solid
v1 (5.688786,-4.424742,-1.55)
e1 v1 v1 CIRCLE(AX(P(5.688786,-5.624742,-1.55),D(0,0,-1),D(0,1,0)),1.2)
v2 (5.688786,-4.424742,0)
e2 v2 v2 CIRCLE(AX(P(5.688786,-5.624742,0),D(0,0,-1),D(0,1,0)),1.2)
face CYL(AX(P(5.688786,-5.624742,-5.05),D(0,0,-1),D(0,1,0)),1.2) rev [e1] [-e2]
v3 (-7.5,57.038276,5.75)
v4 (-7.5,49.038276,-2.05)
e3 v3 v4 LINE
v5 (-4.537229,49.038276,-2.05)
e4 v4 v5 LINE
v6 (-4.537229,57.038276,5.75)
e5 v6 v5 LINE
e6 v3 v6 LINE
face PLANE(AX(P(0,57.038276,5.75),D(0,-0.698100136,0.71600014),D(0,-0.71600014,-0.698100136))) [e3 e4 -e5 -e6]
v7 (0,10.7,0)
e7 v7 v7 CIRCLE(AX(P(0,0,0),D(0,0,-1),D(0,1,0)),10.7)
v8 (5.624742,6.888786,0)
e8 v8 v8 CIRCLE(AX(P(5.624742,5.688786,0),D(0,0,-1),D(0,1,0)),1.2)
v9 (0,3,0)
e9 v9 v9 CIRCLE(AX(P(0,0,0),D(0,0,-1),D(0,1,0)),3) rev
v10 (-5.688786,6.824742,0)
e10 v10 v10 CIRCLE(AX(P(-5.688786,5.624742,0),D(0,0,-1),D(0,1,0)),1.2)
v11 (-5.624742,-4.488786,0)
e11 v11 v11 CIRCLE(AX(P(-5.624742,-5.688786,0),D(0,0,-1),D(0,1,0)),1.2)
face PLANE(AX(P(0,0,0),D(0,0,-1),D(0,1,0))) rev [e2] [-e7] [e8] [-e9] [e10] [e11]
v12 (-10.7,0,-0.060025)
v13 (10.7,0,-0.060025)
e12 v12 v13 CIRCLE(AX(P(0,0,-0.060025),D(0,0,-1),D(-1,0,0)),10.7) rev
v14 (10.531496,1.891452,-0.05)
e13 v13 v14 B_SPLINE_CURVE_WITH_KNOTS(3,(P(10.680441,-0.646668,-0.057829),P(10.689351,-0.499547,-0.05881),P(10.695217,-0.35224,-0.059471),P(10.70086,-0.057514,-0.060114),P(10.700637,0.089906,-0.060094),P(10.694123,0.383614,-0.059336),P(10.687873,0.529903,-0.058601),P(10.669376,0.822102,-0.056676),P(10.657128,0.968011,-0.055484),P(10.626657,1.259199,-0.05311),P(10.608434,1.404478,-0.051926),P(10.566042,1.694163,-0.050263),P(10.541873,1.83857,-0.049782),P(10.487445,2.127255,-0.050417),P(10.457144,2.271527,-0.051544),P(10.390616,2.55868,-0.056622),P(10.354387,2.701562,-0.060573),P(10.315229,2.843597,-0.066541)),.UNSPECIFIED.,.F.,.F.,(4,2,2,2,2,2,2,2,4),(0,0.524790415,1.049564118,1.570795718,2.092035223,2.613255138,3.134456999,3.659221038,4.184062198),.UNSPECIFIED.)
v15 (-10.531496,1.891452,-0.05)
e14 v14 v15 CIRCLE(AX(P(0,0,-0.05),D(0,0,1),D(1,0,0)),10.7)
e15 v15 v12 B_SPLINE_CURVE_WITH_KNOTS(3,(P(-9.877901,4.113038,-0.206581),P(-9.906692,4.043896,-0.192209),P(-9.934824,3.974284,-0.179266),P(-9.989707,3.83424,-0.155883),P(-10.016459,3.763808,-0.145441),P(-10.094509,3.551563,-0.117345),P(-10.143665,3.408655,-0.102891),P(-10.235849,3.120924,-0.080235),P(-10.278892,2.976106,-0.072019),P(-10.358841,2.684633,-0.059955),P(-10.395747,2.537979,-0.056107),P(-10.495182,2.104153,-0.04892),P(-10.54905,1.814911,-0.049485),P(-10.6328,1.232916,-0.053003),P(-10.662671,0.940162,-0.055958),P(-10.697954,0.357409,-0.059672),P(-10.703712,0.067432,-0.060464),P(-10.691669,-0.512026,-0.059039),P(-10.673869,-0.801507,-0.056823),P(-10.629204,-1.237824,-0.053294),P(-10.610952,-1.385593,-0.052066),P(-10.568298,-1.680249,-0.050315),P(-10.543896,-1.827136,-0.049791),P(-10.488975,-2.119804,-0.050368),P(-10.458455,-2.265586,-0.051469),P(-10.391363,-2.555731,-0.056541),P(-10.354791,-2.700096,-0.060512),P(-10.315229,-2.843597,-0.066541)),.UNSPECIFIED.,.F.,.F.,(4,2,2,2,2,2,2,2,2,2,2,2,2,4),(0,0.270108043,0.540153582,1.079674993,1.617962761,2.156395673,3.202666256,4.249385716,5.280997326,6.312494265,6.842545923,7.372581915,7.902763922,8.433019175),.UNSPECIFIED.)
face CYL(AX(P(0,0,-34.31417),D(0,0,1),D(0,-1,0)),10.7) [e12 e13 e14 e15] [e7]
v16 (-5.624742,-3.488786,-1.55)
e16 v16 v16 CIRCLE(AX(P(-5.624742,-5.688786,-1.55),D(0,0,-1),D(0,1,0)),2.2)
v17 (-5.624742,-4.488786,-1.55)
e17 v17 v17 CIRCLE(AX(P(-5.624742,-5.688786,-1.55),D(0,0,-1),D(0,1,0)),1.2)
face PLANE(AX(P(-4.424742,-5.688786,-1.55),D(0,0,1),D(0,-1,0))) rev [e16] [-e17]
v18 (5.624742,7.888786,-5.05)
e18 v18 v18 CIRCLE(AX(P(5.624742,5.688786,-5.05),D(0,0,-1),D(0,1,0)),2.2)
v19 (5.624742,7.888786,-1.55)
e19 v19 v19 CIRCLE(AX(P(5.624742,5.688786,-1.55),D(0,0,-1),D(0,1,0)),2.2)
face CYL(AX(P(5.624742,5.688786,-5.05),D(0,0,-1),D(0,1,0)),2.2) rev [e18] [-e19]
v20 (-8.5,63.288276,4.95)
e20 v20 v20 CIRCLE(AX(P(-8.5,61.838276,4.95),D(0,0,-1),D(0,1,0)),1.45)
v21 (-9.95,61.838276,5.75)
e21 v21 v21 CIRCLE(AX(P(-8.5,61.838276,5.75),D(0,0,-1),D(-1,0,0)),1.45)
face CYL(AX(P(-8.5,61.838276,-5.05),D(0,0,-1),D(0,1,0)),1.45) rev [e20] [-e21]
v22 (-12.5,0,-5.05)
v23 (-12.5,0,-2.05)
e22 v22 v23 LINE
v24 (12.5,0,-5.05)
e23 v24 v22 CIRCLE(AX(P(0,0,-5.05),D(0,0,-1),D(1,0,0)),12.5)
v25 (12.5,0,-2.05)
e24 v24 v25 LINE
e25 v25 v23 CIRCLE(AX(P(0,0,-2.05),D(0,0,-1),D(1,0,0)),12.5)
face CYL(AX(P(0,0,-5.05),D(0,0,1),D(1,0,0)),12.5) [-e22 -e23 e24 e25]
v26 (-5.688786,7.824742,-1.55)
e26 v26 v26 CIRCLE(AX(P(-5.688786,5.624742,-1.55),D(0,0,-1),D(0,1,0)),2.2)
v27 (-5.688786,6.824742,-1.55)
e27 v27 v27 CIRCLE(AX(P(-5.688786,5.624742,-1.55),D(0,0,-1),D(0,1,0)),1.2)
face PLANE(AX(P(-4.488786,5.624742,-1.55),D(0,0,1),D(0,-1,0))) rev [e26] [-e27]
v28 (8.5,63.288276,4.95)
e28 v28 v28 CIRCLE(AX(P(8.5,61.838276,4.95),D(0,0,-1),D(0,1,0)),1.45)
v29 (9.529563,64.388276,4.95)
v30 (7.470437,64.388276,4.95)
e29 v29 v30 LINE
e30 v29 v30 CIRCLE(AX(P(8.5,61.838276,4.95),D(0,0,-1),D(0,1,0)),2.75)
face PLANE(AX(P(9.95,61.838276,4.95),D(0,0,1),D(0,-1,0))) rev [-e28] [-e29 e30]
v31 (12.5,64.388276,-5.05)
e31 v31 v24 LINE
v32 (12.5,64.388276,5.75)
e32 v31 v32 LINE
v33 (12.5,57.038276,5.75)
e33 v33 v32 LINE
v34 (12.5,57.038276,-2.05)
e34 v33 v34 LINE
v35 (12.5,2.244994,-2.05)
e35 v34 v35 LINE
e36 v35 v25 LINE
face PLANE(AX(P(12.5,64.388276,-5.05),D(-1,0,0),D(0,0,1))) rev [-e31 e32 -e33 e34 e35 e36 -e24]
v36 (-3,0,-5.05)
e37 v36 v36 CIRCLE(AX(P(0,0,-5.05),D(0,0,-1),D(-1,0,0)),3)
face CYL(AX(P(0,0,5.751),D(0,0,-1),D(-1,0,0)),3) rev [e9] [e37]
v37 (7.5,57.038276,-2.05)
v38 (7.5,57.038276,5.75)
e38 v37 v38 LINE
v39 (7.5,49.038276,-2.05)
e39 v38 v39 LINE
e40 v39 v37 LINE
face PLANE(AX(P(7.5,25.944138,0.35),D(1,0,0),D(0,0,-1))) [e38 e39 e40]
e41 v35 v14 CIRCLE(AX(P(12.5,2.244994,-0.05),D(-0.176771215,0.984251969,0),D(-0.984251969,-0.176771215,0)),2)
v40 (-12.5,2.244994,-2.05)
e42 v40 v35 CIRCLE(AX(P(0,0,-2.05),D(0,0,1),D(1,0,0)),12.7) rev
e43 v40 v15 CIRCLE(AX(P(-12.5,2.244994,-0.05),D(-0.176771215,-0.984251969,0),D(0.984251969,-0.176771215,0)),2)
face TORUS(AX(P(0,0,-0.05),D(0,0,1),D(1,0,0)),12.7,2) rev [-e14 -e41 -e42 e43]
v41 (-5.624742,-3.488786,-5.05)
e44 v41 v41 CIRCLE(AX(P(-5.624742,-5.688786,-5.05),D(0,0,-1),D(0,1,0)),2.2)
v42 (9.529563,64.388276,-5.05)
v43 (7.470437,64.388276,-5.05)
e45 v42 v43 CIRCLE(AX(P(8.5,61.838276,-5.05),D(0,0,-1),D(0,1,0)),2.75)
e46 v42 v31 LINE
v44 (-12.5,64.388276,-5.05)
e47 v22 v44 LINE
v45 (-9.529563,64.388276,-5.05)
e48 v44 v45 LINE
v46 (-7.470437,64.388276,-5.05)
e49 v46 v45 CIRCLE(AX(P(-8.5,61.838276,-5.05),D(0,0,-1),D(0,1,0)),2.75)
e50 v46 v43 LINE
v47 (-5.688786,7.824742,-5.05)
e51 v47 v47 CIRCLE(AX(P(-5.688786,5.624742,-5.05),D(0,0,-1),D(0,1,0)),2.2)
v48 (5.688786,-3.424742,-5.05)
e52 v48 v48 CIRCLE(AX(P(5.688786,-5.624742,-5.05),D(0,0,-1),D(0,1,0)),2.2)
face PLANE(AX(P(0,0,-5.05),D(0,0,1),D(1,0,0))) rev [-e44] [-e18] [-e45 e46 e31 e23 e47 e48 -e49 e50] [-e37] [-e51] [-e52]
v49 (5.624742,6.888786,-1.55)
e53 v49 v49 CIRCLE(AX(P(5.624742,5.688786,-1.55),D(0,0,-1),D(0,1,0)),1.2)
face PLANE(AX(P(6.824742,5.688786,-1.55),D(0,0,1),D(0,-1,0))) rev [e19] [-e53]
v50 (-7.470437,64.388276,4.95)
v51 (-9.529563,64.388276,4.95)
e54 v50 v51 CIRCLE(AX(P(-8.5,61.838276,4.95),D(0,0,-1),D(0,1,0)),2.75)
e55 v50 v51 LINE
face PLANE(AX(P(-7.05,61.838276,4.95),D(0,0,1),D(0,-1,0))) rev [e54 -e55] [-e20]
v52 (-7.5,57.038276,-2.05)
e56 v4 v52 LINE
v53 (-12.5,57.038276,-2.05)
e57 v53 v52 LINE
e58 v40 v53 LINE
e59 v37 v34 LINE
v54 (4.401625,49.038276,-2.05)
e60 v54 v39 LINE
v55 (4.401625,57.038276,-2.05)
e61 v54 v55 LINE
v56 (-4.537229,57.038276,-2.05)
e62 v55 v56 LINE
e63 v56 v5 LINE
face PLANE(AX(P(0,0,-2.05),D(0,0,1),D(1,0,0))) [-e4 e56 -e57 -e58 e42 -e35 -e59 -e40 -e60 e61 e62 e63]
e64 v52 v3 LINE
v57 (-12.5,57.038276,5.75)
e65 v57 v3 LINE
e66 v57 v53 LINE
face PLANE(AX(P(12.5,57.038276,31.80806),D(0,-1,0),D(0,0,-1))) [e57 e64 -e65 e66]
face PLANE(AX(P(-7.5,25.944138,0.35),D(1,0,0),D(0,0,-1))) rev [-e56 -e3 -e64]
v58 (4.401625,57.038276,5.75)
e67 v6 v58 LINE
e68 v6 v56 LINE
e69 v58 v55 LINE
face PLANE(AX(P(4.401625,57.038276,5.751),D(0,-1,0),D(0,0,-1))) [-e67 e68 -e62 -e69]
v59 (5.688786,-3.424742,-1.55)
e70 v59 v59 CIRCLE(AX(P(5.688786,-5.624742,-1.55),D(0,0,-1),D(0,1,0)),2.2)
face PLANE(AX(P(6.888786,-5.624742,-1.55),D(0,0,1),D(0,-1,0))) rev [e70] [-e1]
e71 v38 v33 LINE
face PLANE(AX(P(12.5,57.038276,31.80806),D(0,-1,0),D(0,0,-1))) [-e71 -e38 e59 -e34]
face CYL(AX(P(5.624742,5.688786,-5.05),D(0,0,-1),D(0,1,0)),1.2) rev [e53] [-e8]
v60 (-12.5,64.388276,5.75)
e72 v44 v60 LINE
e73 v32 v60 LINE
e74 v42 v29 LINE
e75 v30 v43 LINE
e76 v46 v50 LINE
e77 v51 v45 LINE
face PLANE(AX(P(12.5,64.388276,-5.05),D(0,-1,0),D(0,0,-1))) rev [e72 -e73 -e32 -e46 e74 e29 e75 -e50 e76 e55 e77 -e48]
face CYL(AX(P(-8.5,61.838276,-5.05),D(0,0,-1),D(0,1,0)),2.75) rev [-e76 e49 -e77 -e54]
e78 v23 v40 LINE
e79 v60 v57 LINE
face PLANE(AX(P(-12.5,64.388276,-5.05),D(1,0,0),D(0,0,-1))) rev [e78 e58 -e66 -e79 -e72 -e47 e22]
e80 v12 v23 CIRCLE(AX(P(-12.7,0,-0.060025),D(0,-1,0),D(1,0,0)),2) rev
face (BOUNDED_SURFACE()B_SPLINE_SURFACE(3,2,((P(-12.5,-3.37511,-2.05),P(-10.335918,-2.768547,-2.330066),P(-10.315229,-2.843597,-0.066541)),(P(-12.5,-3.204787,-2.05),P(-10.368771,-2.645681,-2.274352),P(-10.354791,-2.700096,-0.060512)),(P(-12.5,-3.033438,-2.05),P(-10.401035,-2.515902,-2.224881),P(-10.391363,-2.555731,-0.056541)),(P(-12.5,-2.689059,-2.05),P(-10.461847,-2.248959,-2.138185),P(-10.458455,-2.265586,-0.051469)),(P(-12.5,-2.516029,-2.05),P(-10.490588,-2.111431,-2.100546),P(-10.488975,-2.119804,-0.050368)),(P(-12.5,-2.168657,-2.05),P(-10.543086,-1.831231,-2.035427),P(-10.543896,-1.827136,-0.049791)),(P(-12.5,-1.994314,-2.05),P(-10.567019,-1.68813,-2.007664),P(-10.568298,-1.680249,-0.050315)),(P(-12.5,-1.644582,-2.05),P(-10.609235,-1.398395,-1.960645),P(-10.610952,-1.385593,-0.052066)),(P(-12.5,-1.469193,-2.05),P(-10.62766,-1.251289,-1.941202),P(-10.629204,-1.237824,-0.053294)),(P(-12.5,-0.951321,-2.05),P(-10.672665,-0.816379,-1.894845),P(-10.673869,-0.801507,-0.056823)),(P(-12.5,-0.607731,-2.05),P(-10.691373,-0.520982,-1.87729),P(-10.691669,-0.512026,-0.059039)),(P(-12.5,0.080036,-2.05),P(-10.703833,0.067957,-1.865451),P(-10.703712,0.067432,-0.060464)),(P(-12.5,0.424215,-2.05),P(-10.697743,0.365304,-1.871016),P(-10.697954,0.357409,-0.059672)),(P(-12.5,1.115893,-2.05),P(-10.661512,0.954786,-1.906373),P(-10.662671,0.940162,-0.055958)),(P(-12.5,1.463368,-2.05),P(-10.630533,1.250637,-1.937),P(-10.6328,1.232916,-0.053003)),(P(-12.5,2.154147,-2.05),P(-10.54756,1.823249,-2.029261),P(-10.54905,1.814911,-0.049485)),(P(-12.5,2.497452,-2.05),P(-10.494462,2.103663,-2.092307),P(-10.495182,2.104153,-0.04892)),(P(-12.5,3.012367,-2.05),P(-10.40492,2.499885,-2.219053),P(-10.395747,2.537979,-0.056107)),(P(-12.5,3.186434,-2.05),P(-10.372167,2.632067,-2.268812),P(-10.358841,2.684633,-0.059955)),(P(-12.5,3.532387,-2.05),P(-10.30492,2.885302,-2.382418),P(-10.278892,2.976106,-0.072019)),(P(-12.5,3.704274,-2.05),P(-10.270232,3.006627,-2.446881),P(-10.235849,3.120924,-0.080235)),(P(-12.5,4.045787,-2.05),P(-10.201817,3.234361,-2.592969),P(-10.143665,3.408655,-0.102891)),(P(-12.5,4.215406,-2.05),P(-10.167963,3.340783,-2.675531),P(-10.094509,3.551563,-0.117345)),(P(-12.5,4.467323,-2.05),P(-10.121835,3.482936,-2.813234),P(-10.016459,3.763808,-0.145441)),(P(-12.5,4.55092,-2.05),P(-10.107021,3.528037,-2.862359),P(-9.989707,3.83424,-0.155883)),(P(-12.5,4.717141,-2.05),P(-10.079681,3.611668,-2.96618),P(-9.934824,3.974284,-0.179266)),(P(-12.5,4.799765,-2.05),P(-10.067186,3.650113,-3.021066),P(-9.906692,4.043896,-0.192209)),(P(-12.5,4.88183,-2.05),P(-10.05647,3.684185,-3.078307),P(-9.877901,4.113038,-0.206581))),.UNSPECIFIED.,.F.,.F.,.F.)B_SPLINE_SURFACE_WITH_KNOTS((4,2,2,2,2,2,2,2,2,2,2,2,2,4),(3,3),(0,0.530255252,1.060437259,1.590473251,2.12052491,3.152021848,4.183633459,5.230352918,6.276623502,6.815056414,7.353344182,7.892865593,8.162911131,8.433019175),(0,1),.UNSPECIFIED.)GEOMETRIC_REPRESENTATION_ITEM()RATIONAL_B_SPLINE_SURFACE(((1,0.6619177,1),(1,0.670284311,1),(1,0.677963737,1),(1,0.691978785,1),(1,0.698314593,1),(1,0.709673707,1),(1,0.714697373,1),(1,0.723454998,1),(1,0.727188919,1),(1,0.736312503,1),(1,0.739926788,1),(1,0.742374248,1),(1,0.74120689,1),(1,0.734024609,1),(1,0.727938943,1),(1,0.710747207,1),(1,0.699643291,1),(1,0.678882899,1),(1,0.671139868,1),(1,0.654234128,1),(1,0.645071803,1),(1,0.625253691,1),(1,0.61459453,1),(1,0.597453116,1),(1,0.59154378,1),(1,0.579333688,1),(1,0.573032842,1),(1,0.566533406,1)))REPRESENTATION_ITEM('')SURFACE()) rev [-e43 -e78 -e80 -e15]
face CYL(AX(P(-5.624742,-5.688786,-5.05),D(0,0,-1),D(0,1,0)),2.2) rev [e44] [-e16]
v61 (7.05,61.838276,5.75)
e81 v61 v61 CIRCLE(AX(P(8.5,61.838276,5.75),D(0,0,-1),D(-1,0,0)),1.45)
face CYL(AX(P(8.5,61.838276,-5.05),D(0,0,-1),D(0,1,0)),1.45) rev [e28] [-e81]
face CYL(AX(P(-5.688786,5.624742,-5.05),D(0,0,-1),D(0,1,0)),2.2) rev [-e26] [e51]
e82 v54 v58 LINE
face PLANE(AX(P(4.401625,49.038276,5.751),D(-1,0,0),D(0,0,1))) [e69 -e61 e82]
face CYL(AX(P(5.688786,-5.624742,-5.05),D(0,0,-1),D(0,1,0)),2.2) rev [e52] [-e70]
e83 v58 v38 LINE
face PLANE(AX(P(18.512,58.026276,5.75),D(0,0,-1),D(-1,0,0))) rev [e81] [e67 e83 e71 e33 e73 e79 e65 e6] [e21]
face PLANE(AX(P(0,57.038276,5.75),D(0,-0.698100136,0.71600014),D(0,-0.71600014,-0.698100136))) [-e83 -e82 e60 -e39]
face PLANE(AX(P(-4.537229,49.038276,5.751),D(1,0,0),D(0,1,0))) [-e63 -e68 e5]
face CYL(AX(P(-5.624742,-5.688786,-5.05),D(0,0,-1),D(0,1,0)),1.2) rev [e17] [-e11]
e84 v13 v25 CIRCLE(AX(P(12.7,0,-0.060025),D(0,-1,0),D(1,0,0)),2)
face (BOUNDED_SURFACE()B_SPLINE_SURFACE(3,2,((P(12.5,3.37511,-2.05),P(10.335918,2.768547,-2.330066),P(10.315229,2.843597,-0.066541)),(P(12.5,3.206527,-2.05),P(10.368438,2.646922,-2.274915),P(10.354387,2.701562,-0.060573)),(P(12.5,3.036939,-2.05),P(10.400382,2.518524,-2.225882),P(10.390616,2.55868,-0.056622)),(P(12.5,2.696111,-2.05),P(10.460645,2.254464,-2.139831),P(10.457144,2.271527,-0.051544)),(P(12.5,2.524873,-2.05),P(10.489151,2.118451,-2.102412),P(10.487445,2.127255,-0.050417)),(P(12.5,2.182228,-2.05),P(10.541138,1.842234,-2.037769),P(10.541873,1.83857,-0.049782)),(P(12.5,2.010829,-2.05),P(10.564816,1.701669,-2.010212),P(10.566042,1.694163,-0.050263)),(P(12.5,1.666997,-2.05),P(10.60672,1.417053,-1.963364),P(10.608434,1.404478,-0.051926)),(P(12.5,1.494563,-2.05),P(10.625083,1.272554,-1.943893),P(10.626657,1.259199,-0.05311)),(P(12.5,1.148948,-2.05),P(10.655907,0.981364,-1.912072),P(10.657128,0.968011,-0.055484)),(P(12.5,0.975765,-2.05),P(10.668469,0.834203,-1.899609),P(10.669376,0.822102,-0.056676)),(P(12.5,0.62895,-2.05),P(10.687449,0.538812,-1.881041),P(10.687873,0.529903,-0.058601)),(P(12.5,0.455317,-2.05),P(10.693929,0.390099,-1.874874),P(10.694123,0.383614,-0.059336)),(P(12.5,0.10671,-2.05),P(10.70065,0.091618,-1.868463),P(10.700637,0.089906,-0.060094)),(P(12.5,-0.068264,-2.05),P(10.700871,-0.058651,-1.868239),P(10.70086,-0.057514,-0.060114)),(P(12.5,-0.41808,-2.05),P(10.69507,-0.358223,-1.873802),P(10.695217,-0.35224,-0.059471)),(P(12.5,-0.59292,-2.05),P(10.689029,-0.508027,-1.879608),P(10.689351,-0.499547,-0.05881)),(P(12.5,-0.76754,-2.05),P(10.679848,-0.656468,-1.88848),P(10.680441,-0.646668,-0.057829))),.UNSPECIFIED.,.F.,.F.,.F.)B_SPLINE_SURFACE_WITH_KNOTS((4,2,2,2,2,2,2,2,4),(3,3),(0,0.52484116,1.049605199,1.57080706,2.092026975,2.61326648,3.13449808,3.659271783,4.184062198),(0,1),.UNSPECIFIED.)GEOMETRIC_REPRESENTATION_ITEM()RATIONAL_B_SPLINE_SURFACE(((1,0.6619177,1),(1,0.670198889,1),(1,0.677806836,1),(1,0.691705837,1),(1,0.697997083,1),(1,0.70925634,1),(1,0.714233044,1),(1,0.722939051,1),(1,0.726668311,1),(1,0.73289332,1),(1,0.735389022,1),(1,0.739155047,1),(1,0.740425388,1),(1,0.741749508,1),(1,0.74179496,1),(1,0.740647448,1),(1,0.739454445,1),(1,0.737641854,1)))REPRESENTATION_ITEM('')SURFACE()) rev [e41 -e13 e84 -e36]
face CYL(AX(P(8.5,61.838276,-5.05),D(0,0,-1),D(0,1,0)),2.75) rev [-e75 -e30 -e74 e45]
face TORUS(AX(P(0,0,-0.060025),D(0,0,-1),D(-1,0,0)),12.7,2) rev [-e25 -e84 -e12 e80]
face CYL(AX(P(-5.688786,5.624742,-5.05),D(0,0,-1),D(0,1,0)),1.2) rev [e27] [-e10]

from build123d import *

# Parameters (mm, degrees)
ESBO_O1_R                                            = 10.7
RESSALTO_EXTRUS_O1_DEPTH                             = 2.05
RESSALTO_EXTRUS_O2_DEPTH                             = 3
ESBO_O4_W                                            = 25
ESBO_O4_H                                            = 7.35
RESSALTO_EXTRUS_O3_DEPTH                             = 10.8
REBAIXO_PARA_SHCS_M2_51_D                            = 2.9
REBAIXO_PARA_SHCS_M2_51_CBORE_D                      = 5.5
REBAIXO_PARA_SHCS_M2_51_CBORE_DEPTH                  = 10
REBAIXO_PARA_PARAFUSO_COM_CABE_A_REDONDA_D           = 2.4
REBAIXO_PARA_PARAFUSO_COM_CABE_A_REDONDA_CBORE_D     = 4.4
REBAIXO_PARA_PARAFUSO_COM_CABE_A_REDONDA_CBORE_DEPTH = 3.5
PADR_OCIRCULAR1_COUNT                                = 4
NERVURA1_REACH                                       = 67.842
ESBO_O5_WALL_W                                       = 144.857085312
ESBO_O5_WALL_H                                       = 15
CORTE_EXTRUS_O1_REACH                                = 68.053
ESBO_O6_W                                            = 8.93885445
ESBO_O6_H                                            = 8
CORTE_EXTRUS_O2_REACH                                = 68.474
ESBO_O7_R                                            = 3
FILETE1_R                                            = 2


with BuildPart() as part:
    # Esboço1 → Ressalto-extrusão1 (new body)
    with BuildSketch(Plane(origin=(0, 0, 0), x_dir=(-1, 0, 0), z_dir=(0, 0, -1))):
        Circle(ESBO_O1_R)
    extrude(amount=RESSALTO_EXTRUS_O1_DEPTH)

    # Esboço2 → Ressalto-extrusão2 (add)
    with BuildSketch(Plane(origin=(0, 0, -2.05), x_dir=(-1, 0, 0), z_dir=(0, 0, -1))):
        with BuildLine():
            Line((-12.5, 64.388275999), (12.5, 64.388275999))
            Line((12.5, 64.388275999), (12.5, 0))
            ThreePointArc((12.5, 0), (0, -12.5), (-12.5, 0))
            Line((-12.5, 0), (-12.5, 64.388275999))
        make_face()
    extrude(amount=RESSALTO_EXTRUS_O2_DEPTH)

    # Esboço4 → Ressalto-extrusão3 (add)
    with BuildSketch(Plane(origin=(0, 0, -5.05), x_dir=(-1, 0, 0), z_dir=(0, 0, -1))):
        with Locations((0, 60.713275999)):
            Rectangle(ESBO_O4_W, ESBO_O4_H)
    extrude(amount=-RESSALTO_EXTRUS_O3_DEPTH)

    # Rebaixo para SHCS M2.51 (through all)
    with Locations(Plane(origin=(0, 0, -5.05), x_dir=(-1, 0, 0), z_dir=(0, 0, -1))):
        with Locations((-8.5, 61.838275999), (8.5, 61.838275999)):
            CounterBoreHole(REBAIXO_PARA_SHCS_M2_51_D / 2, REBAIXO_PARA_SHCS_M2_51_CBORE_D / 2, REBAIXO_PARA_SHCS_M2_51_CBORE_DEPTH)

    # Rebaixo para parafuso com cabeça redonda de M21 (through all)
    with Locations(Plane(origin=(0, 0, -5.05), x_dir=(-1, 0, 0), z_dir=(0, 0, -1))):
        with Locations((-5.624741587, 5.688785642)):
            rebaixo_para_parafuso_com_cabe_a_redonda = CounterBoreHole(REBAIXO_PARA_PARAFUSO_COM_CABE_A_REDONDA_D / 2, REBAIXO_PARA_PARAFUSO_COM_CABE_A_REDONDA_CBORE_D / 2, REBAIXO_PARA_PARAFUSO_COM_CABE_A_REDONDA_CBORE_DEPTH)

    # PadrãoCircular1: Rebaixo para parafuso com cabeça redonda de M21 ×4 about axis
    padr_ocircular1_axis = Axis((0, 0, 0), (0, 0, 1))
    for i in range(1, PADR_OCIRCULAR1_COUNT):
        add(rebaixo_para_parafuso_com_cabe_a_redonda.rotate(padr_ocircular1_axis, i * 360 / PADR_OCIRCULAR1_COUNT), mode=Mode.SUBTRACT)

    # Esboço5 wall → Nervura1 (add, up to next)
    with BuildSketch(Plane(origin=(0, 53.038275999, 1.85), x_dir=(0, -0.71600013962, -0.69810013613), z_dir=(0, 0.69810013613, -0.71600013962)), mode=Mode.PRIVATE) as nervura1_sk1:
        Rectangle(ESBO_O5_WALL_W, ESBO_O5_WALL_H)
    nervura1_tool1 = extrude(nervura1_sk1.sketch, amount=NERVURA1_REACH, mode=Mode.PRIVATE) - part.part
    add(nervura1_tool1.solids().sort_by_distance((0, 53.038275999, 1.85))[0])

    # Esboço6 → Corte-extrusão1 (cut, up to next)
    with BuildSketch(Plane.XY.offset(-2.05), mode=Mode.PRIVATE) as corte_extrus_o1_sk1:
        with Locations((-0.067802218, 53.038275999)):
            Rectangle(ESBO_O6_W, ESBO_O6_H)
    corte_extrus_o1_tool1 = extrude(corte_extrus_o1_sk1.sketch, amount=CORTE_EXTRUS_O1_REACH, mode=Mode.PRIVATE) & part.part
    add(corte_extrus_o1_tool1.solids().sort_by_distance((-0.067802, 53.038276, -2.05))[0], mode=Mode.SUBTRACT)

    # Esboço7 → Corte-extrusão2 (cut, up to next)
    with BuildSketch(Plane(origin=(0, 0, -5.05), x_dir=(-1, 0, 0), z_dir=(0, 0, -1)), mode=Mode.PRIVATE) as corte_extrus_o2_sk1:
        Circle(ESBO_O7_R)
    corte_extrus_o2_tool1 = extrude(corte_extrus_o2_sk1.sketch, amount=-CORTE_EXTRUS_O2_REACH, mode=Mode.PRIVATE) & part.part
    add(corte_extrus_o2_tool1.solids().sort_by_distance((0, 0, -5.05))[0], mode=Mode.SUBTRACT)

    # Filete1
    filete1_edges = [part.edges().sort_by_distance(p)[0] for p in [
        (10.7, 0, -2.05),
    ]]
    fillet(filete1_edges, radius=FILETE1_R - 0.0001)  # a hair under: the kernel refuses the full size


solid = part.part
